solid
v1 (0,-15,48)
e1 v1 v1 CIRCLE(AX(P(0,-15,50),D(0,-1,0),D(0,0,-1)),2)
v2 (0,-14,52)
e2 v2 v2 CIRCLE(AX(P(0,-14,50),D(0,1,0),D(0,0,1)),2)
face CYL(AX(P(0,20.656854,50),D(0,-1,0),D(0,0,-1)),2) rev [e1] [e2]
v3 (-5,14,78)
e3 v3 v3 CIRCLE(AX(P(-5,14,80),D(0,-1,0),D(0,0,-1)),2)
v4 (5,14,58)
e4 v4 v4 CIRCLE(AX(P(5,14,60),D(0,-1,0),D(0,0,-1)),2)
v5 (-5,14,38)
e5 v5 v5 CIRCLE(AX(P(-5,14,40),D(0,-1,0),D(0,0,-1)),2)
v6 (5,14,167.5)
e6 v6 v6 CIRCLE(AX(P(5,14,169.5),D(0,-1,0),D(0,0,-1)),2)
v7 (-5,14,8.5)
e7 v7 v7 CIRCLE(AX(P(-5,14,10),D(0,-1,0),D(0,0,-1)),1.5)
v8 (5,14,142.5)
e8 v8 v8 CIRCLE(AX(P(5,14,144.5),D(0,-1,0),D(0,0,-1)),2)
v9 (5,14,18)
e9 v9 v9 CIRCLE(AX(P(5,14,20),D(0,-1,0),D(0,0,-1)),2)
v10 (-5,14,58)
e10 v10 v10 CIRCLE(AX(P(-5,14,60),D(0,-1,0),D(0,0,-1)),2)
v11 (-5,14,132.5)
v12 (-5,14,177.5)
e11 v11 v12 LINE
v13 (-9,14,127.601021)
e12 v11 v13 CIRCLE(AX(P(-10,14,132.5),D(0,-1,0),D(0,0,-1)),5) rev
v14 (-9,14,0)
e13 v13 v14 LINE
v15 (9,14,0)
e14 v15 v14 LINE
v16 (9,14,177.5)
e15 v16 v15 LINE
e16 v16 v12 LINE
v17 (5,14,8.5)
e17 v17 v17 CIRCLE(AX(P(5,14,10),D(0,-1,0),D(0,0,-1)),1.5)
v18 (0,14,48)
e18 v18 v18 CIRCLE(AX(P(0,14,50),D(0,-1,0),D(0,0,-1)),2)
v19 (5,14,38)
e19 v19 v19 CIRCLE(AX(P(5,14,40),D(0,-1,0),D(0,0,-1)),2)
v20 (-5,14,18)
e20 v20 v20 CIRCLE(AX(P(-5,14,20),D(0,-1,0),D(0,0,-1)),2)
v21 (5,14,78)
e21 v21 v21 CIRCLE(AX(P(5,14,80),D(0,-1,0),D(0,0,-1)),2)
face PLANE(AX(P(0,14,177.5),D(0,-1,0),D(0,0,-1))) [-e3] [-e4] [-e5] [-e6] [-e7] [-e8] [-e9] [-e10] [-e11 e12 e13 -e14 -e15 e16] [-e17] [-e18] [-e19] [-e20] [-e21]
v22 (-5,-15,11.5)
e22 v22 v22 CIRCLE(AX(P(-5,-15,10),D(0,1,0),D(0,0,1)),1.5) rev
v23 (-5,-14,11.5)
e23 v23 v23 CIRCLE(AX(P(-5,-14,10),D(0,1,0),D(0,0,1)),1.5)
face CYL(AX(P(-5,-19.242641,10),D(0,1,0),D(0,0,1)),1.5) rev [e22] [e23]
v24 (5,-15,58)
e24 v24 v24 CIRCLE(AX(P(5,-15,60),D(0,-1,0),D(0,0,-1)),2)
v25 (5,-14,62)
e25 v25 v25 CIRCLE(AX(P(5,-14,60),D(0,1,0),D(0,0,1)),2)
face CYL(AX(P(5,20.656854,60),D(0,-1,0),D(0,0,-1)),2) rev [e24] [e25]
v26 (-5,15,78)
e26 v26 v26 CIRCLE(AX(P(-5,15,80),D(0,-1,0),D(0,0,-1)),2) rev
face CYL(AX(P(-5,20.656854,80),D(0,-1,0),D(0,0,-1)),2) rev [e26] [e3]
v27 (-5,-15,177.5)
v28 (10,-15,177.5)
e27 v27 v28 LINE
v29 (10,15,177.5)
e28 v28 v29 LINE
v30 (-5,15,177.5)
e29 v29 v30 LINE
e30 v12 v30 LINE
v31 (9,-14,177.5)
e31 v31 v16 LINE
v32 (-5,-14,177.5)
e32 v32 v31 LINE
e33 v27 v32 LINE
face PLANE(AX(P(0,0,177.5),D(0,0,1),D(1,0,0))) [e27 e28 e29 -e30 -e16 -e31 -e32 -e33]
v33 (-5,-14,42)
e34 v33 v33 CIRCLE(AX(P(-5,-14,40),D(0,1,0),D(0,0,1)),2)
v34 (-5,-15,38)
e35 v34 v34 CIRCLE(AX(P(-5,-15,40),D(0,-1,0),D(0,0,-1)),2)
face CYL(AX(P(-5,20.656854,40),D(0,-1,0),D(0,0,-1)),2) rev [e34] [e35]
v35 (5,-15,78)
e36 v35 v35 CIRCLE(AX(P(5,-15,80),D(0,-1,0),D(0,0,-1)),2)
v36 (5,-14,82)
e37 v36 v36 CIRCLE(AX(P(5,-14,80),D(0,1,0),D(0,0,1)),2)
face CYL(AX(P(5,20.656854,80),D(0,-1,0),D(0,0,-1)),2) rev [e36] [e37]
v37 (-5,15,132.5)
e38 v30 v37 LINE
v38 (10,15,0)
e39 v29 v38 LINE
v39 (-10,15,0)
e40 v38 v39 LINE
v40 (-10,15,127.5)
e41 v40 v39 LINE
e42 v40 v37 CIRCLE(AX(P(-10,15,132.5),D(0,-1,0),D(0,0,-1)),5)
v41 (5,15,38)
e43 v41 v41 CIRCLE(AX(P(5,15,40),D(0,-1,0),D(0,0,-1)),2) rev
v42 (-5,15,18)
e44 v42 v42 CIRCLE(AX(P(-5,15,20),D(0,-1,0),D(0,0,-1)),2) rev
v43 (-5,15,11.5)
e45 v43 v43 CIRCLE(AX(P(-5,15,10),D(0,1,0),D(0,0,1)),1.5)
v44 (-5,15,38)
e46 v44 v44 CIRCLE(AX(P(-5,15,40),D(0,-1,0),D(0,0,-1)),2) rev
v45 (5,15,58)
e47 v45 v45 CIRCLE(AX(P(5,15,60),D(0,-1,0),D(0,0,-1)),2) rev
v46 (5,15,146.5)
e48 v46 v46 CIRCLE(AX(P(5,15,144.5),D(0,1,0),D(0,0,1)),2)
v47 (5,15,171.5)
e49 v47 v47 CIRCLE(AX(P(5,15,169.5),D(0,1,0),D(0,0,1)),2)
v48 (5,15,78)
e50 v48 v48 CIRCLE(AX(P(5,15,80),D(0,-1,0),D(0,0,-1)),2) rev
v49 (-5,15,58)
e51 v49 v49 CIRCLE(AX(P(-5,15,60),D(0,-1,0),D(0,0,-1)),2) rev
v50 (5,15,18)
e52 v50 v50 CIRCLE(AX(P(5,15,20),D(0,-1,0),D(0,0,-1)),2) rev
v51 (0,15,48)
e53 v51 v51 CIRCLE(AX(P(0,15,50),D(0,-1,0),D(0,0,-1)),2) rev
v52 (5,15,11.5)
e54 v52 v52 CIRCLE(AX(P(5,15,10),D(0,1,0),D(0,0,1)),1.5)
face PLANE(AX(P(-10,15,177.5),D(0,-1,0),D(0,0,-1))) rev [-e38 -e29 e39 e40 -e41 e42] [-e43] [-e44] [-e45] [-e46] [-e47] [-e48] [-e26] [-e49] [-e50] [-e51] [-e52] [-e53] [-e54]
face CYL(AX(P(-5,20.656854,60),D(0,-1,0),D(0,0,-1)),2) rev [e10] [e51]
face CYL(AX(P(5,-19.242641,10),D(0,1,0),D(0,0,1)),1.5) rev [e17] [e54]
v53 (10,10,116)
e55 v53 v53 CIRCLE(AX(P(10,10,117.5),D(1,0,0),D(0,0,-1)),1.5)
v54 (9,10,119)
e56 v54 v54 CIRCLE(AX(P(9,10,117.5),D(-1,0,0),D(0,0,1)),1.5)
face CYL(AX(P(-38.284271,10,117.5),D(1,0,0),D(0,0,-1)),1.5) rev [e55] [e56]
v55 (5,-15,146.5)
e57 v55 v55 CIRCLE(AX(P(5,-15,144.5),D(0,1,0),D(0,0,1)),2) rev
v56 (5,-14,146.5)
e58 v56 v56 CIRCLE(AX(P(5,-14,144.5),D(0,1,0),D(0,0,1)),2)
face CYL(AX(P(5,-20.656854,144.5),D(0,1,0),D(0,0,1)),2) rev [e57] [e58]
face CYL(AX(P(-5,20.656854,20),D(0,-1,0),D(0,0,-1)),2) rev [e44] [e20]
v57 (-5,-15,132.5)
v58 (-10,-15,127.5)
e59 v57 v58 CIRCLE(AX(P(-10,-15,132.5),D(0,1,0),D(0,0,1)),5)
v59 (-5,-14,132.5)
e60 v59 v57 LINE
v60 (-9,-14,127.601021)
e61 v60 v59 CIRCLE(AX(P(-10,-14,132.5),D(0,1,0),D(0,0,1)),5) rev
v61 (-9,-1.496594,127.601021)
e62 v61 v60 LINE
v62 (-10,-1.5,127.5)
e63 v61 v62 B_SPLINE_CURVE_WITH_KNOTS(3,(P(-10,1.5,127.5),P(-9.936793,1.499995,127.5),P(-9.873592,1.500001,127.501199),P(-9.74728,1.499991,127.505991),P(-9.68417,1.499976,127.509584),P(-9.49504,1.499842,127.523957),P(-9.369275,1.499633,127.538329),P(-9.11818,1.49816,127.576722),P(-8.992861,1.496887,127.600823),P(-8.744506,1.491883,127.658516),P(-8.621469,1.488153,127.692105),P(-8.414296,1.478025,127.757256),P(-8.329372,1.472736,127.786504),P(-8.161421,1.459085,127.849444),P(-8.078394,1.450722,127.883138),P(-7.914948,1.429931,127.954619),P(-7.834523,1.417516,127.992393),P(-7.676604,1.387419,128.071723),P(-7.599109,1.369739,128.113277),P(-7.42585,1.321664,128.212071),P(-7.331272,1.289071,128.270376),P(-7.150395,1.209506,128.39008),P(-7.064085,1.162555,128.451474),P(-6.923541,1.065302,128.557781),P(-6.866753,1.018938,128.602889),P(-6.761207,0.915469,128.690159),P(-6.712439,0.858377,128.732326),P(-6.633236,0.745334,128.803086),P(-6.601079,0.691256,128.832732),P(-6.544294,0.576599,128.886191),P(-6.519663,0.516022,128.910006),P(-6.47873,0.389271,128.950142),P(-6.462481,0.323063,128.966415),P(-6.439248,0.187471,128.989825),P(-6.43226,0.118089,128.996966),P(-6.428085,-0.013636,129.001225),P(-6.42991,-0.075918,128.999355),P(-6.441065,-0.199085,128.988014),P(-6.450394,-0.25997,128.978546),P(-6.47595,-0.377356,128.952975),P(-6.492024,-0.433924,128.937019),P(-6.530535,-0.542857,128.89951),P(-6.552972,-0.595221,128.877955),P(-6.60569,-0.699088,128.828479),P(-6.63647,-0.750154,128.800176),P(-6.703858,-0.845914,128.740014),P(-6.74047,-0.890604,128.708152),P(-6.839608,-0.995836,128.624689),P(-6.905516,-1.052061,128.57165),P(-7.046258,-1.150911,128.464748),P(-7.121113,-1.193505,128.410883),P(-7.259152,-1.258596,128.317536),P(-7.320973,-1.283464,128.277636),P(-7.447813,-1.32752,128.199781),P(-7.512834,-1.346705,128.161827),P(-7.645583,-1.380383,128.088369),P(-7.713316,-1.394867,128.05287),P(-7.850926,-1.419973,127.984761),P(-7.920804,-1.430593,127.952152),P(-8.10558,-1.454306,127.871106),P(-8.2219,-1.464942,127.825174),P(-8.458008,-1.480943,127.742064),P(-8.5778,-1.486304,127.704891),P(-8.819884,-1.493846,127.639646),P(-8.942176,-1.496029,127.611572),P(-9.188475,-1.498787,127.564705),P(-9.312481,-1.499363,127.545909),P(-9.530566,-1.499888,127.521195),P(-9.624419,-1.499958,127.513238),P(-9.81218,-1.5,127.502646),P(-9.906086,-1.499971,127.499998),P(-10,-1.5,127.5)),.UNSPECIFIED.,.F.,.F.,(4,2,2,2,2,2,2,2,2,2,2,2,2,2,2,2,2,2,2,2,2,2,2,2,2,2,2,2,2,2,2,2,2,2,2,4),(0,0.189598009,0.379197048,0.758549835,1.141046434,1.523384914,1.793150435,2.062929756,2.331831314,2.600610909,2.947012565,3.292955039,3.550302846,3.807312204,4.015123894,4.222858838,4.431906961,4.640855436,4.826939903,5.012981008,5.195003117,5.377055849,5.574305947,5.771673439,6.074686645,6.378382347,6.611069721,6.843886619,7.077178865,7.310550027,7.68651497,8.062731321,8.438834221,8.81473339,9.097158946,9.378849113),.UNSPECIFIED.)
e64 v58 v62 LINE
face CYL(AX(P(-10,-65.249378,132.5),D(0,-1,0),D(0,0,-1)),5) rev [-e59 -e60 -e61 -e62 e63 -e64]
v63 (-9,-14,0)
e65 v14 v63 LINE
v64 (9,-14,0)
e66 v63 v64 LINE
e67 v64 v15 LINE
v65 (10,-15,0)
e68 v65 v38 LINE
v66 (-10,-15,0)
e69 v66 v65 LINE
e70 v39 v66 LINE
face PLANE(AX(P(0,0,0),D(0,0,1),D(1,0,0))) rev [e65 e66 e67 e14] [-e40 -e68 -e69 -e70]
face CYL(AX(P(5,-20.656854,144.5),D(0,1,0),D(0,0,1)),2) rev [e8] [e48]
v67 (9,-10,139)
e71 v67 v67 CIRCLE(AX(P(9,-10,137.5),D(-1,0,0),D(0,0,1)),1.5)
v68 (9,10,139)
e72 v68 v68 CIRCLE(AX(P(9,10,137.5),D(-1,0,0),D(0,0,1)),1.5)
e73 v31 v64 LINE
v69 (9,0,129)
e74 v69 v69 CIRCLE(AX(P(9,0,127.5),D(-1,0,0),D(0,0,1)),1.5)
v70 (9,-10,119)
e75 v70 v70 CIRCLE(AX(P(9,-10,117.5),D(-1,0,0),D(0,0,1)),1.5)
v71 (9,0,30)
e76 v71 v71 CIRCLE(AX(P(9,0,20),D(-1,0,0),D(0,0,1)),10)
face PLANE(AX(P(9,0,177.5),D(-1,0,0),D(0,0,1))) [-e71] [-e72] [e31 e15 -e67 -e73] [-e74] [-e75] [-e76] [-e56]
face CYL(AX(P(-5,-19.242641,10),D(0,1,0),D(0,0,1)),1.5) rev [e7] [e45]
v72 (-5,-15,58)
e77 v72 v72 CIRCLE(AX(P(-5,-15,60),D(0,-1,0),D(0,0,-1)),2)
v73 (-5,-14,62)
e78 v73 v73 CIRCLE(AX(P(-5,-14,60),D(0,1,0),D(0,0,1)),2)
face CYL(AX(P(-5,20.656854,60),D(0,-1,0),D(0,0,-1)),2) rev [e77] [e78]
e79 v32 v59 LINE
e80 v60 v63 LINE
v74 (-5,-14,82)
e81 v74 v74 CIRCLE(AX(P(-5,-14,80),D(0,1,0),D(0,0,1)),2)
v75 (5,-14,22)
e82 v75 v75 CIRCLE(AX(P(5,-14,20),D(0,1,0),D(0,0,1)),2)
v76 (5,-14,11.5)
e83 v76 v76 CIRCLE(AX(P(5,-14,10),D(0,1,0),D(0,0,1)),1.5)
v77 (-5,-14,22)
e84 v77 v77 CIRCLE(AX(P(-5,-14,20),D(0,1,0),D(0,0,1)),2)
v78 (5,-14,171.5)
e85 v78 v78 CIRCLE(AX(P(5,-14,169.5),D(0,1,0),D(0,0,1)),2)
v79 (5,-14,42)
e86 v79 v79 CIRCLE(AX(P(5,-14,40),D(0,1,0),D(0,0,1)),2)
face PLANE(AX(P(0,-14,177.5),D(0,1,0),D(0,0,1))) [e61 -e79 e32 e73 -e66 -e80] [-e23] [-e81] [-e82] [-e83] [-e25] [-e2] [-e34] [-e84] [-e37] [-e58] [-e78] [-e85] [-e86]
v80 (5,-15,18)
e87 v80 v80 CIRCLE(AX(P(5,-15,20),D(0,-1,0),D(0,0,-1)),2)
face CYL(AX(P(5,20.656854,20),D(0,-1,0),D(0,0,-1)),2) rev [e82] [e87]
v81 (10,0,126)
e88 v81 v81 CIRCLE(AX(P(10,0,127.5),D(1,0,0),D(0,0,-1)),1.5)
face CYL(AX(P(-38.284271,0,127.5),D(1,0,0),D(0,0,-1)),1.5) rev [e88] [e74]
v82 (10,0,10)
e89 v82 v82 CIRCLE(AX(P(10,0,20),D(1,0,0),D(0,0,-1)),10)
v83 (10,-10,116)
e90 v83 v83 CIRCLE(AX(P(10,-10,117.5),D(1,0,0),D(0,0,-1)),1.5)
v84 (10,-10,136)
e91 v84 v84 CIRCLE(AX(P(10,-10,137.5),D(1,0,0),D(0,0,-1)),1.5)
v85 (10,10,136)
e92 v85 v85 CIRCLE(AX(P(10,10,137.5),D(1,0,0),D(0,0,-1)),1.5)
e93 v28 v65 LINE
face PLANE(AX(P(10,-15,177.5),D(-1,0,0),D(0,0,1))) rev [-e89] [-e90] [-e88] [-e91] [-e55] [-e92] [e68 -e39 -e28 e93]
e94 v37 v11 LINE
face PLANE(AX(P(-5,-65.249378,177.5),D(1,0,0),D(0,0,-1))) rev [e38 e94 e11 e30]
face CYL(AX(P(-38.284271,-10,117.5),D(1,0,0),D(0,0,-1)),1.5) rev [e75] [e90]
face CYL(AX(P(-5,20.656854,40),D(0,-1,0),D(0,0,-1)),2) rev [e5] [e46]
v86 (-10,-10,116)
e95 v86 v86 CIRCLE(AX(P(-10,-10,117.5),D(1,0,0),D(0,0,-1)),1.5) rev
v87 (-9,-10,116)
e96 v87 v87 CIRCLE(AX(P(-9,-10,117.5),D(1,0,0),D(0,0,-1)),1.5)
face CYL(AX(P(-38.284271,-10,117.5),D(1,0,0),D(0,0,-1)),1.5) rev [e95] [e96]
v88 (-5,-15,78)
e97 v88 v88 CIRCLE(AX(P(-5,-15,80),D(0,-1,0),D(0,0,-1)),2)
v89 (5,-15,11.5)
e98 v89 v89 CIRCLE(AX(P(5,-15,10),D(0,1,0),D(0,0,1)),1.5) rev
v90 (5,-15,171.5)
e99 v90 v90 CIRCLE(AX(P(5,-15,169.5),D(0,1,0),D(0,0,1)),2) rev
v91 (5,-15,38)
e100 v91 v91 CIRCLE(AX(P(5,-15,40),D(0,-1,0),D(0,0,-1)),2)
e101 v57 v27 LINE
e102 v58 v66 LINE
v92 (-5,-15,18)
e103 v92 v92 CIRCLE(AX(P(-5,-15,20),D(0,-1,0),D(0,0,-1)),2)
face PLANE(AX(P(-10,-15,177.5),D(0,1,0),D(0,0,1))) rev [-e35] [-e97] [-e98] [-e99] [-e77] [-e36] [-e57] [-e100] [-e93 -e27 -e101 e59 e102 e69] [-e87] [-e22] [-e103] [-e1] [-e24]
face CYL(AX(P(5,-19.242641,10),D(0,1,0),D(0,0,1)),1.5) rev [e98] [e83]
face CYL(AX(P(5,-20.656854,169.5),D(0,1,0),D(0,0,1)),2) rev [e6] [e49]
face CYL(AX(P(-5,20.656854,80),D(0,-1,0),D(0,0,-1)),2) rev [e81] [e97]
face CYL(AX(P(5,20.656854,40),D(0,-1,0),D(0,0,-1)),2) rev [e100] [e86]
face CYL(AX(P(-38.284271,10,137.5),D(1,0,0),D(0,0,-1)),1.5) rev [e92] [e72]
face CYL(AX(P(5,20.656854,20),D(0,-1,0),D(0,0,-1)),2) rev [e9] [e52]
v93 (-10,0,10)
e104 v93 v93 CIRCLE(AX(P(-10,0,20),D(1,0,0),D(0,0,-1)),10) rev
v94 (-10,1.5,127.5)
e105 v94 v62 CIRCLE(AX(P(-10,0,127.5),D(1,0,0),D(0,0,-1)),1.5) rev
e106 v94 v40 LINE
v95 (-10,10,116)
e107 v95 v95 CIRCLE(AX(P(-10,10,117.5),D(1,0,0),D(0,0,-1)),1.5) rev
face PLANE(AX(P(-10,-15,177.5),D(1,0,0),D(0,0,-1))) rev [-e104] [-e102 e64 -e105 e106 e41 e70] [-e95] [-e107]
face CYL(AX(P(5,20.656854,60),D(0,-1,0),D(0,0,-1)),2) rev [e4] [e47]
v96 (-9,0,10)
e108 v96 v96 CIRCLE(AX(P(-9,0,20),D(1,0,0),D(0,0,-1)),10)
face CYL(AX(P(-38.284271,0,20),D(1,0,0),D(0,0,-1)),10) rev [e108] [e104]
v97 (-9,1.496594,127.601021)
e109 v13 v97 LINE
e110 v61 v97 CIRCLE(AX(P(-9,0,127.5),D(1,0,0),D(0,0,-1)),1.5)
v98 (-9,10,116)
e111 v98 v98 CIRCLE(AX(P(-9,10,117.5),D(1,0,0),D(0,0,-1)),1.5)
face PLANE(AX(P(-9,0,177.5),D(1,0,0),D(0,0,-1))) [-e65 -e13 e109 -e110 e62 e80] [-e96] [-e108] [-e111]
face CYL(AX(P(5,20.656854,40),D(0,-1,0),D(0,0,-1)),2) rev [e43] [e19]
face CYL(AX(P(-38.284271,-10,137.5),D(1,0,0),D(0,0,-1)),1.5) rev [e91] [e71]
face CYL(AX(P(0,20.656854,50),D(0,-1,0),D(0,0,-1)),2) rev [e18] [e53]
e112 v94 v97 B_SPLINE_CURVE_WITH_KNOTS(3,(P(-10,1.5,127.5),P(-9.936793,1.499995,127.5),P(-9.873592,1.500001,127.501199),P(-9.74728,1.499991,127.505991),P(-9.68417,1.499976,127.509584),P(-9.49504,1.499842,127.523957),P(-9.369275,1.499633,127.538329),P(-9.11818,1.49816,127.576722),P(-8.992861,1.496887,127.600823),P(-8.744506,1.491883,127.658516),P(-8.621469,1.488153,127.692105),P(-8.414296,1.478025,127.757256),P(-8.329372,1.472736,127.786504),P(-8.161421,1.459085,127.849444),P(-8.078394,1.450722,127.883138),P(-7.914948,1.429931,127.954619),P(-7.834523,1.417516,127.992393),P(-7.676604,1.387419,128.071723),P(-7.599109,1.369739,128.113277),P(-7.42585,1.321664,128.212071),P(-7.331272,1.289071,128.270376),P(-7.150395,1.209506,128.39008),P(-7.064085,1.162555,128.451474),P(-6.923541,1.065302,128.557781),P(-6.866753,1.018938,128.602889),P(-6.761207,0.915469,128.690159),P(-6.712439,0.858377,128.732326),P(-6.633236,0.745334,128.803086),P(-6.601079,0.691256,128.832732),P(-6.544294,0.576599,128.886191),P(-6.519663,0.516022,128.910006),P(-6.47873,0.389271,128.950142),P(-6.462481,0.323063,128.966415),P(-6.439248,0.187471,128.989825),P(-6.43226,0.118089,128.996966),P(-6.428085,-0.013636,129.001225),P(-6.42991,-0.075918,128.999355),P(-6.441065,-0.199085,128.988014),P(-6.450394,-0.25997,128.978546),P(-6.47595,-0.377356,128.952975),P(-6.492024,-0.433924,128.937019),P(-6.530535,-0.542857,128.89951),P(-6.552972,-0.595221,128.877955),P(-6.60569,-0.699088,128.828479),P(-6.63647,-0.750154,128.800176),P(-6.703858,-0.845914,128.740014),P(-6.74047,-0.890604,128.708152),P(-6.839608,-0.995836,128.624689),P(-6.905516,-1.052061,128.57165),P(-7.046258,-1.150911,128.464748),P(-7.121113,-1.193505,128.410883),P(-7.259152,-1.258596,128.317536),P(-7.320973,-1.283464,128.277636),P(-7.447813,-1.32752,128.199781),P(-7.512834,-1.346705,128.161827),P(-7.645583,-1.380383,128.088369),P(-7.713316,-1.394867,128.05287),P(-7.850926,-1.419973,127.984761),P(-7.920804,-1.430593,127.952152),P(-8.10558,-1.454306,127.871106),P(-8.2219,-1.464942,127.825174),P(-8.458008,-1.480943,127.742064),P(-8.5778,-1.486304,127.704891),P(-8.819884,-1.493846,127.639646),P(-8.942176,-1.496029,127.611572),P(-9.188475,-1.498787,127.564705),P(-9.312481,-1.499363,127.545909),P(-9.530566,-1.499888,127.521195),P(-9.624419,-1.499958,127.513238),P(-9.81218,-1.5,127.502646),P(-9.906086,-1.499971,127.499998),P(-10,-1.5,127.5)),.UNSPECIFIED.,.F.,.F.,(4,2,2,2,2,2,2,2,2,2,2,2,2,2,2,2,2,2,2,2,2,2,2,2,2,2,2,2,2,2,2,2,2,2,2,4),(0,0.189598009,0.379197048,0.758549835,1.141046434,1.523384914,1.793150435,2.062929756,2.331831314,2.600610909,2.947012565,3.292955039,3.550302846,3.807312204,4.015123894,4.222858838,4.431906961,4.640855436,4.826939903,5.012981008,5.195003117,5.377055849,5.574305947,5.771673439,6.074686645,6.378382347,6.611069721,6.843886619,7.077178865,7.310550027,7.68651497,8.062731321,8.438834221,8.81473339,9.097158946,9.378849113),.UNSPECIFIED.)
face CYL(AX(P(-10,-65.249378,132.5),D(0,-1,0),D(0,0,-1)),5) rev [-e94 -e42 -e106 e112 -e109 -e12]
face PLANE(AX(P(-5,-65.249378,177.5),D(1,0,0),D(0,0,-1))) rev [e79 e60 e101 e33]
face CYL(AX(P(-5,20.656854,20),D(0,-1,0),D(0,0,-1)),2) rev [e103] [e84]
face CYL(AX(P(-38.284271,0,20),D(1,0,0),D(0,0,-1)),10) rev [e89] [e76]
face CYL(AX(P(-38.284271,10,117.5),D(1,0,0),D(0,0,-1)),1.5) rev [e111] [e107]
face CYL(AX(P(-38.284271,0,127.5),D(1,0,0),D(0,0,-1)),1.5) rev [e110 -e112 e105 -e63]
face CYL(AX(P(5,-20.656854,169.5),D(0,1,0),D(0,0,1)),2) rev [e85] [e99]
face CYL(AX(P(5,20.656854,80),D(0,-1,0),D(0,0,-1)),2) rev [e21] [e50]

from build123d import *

# Parameters (mm, degrees)
SKETCH_1_W          = 20
SKETCH_1_H          = 30
SKETCH_1_W_2        = 18
SKETCH_1_H_2        = 28
EXTRUDE_1_DEPTH     = 177.5
CUT_EXTRUDE_1_REACH = 182.295
SKETCH_2_R          = 1.5
CUT_EXTRUDE_2_REACH = 182.295
SKETCH_3_W          = 5
SKETCH_3_H          = 50
FILLET_1_R          = 5
CUT_EXTRUDE_3_REACH = 182.295
SKETCH_4_R          = 2
CUT_EXTRUDE_4_REACH = 182.295
SKETCH_5_R          = 2
CUT_EXTRUDE_5_REACH = 181.252
SKETCH_6_R          = 1.5
SKETCH_6_R_2        = 10


with BuildPart() as part:
    # 草图1 → 拉伸-薄壁1 (new body)
    with BuildSketch(Plane.XY):
        Rectangle(SKETCH_1_W, SKETCH_1_H)
        Rectangle(SKETCH_1_W_2, SKETCH_1_H_2, mode=Mode.SUBTRACT)
    extrude(amount=EXTRUDE_1_DEPTH)

    # 切除-拉伸1: up to this face of the body (flat: up to its plane)
    cut_extrude_1_end = Plane(part.part.faces().sort_by_distance((0, -15, 88.75))[0])
    # 草图2 → 切除-拉伸1 (cut, up to the picked face)
    with BuildSketch(Plane(origin=(0, 15, 0), x_dir=(1, 0, 0), z_dir=(0, 1, 0)), mode=Mode.PRIVATE) as cut_extrude_1_sk1:
        with Locations(Location((5, -10, 0), (0, 0, 270))):
            Circle(SKETCH_2_R)
    cut_extrude_1_tool1 = split(extrude(cut_extrude_1_sk1.sketch, amount=-CUT_EXTRUDE_1_REACH, mode=Mode.PRIVATE), bisect_by=cut_extrude_1_end, keep=Keep.BOTH, mode=Mode.PRIVATE)
    # 草图2 → 切除-拉伸1 (cut, up to the picked face)
    with BuildSketch(Plane(origin=(0, 15, 0), x_dir=(1, 0, 0), z_dir=(0, 1, 0)), mode=Mode.PRIVATE) as cut_extrude_1_sk2:
        with Locations(Location((-5, -10, 0), (0, 0, 270))):
            Circle(SKETCH_2_R)
    cut_extrude_1_tool2 = split(extrude(cut_extrude_1_sk2.sketch, amount=-CUT_EXTRUDE_1_REACH, mode=Mode.PRIVATE), bisect_by=cut_extrude_1_end, keep=Keep.BOTH, mode=Mode.PRIVATE)
    add(cut_extrude_1_tool1.solids().sort_by(Axis((5, 15, 10), (0, -1, 0)))[0], mode=Mode.SUBTRACT)
    add(cut_extrude_1_tool2.solids().sort_by(Axis((-5, 15, 10), (0, -1, 0)))[0], mode=Mode.SUBTRACT)

    # 切除-拉伸2: up to this face of the body (flat: up to its plane)
    cut_extrude_2_end = Plane(part.part.faces().sort_by_distance((0, -15, 89.064860035))[0])
    # 草图3 → 切除-拉伸2 (cut, up to the picked face)
    with BuildSketch(Plane(origin=(0, 15, 0), x_dir=(1, 0, 0), z_dir=(0, 1, 0)), mode=Mode.PRIVATE) as cut_extrude_2_sk1:
        with Locations((-7.5, -152.5)):
            Rectangle(SKETCH_3_W, SKETCH_3_H)
    cut_extrude_2_tool1 = split(extrude(cut_extrude_2_sk1.sketch, amount=-CUT_EXTRUDE_2_REACH, mode=Mode.PRIVATE), bisect_by=cut_extrude_2_end, keep=Keep.BOTH, mode=Mode.PRIVATE)
    add(cut_extrude_2_tool1.solids().sort_by(Axis((-7.5, 15, 152.5), (0, -1, 0)))[0], mode=Mode.SUBTRACT)

    # 圆角1
    fillet_1_edges = [part.edges().sort_by_distance(p)[0] for p in [
        (-5, 14.5, 127.5),
    ]]
    fillet(fillet_1_edges, radius=FILLET_1_R - 0.0001)  # a hair under: the kernel refuses the full size

    # 切除-拉伸3: up to this face of the body (flat: up to its plane)
    cut_extrude_3_end = Plane(part.part.faces().sort_by_distance((0.559725578, -15, 84.310829926))[0])
    # 草图4 → 切除-拉伸3 (cut, up to the picked face)
    with BuildSketch(Plane(origin=(0, 15, 0), x_dir=(1, 0, 0), z_dir=(0, 1, 0)), mode=Mode.PRIVATE) as cut_extrude_3_sk1:
        with Locations(Location((5, -144.5, 0), (0, 0, 270))):
            Circle(SKETCH_4_R)
    cut_extrude_3_tool1 = split(extrude(cut_extrude_3_sk1.sketch, amount=-CUT_EXTRUDE_3_REACH, mode=Mode.PRIVATE), bisect_by=cut_extrude_3_end, keep=Keep.BOTH, mode=Mode.PRIVATE)
    # 草图4 → 切除-拉伸3 (cut, up to the picked face)
    with BuildSketch(Plane(origin=(0, 15, 0), x_dir=(1, 0, 0), z_dir=(0, 1, 0)), mode=Mode.PRIVATE) as cut_extrude_3_sk2:
        with Locations(Location((5, -169.5, 0), (0, 0, 270))):
            Circle(SKETCH_4_R)
    cut_extrude_3_tool2 = split(extrude(cut_extrude_3_sk2.sketch, amount=-CUT_EXTRUDE_3_REACH, mode=Mode.PRIVATE), bisect_by=cut_extrude_3_end, keep=Keep.BOTH, mode=Mode.PRIVATE)
    add(cut_extrude_3_tool1.solids().sort_by(Axis((5, 15, 144.5), (0, -1, 0)))[0], mode=Mode.SUBTRACT)
    add(cut_extrude_3_tool2.solids().sort_by(Axis((5, 15, 169.5), (0, -1, 0)))[0], mode=Mode.SUBTRACT)

    # 切除-拉伸4: up to this face of the body (flat: up to its plane)
    cut_extrude_4_end = Plane(part.part.faces().sort_by_distance((0.525557475, 15, 83.751483629))[0])
    # 草图5 → 切除-拉伸4 (cut, up to the picked face)
    with BuildSketch(Plane.XZ.offset(15), mode=Mode.PRIVATE) as cut_extrude_4_sk1:
        with Locations(Location((5, 20, 0), (0, 0, 270))):
            Circle(SKETCH_5_R)
    cut_extrude_4_tool1 = split(extrude(cut_extrude_4_sk1.sketch, amount=-CUT_EXTRUDE_4_REACH, mode=Mode.PRIVATE), bisect_by=cut_extrude_4_end, keep=Keep.BOTH, mode=Mode.PRIVATE)
    # 草图5 → 切除-拉伸4 (cut, up to the picked face)
    with BuildSketch(Plane.XZ.offset(15), mode=Mode.PRIVATE) as cut_extrude_4_sk2:
        with Locations(Location((5, 40, 0), (0, 0, 270))):
            Circle(SKETCH_5_R)
    cut_extrude_4_tool2 = split(extrude(cut_extrude_4_sk2.sketch, amount=-CUT_EXTRUDE_4_REACH, mode=Mode.PRIVATE), bisect_by=cut_extrude_4_end, keep=Keep.BOTH, mode=Mode.PRIVATE)
    # 草图5 → 切除-拉伸4 (cut, up to the picked face)
    with BuildSketch(Plane.XZ.offset(15), mode=Mode.PRIVATE) as cut_extrude_4_sk3:
        with Locations(Location((5, 60, 0), (0, 0, 270))):
            Circle(SKETCH_5_R)
    cut_extrude_4_tool3 = split(extrude(cut_extrude_4_sk3.sketch, amount=-CUT_EXTRUDE_4_REACH, mode=Mode.PRIVATE), bisect_by=cut_extrude_4_end, keep=Keep.BOTH, mode=Mode.PRIVATE)
    # 草图5 → 切除-拉伸4 (cut, up to the picked face)
    with BuildSketch(Plane.XZ.offset(15), mode=Mode.PRIVATE) as cut_extrude_4_sk4:
        with Locations(Location((5, 80, 0), (0, 0, 270))):
            Circle(SKETCH_5_R)
    cut_extrude_4_tool4 = split(extrude(cut_extrude_4_sk4.sketch, amount=-CUT_EXTRUDE_4_REACH, mode=Mode.PRIVATE), bisect_by=cut_extrude_4_end, keep=Keep.BOTH, mode=Mode.PRIVATE)
    # 草图5 → 切除-拉伸4 (cut, up to the picked face)
    with BuildSketch(Plane.XZ.offset(15), mode=Mode.PRIVATE) as cut_extrude_4_sk5:
        with Locations(Location((-5, 80, 0), (0, 0, 270))):
            Circle(SKETCH_5_R)
    cut_extrude_4_tool5 = split(extrude(cut_extrude_4_sk5.sketch, amount=-CUT_EXTRUDE_4_REACH, mode=Mode.PRIVATE), bisect_by=cut_extrude_4_end, keep=Keep.BOTH, mode=Mode.PRIVATE)
    # 草图5 → 切除-拉伸4 (cut, up to the picked face)
    with BuildSketch(Plane.XZ.offset(15), mode=Mode.PRIVATE) as cut_extrude_4_sk6:
        with Locations(Location((-5, 60, 0), (0, 0, 270))):
            Circle(SKETCH_5_R)
    cut_extrude_4_tool6 = split(extrude(cut_extrude_4_sk6.sketch, amount=-CUT_EXTRUDE_4_REACH, mode=Mode.PRIVATE), bisect_by=cut_extrude_4_end, keep=Keep.BOTH, mode=Mode.PRIVATE)
    # 草图5 → 切除-拉伸4 (cut, up to the picked face)
    with BuildSketch(Plane.XZ.offset(15), mode=Mode.PRIVATE) as cut_extrude_4_sk7:
        with Locations(Location((-5, 40, 0), (0, 0, 270))):
            Circle(SKETCH_5_R)
    cut_extrude_4_tool7 = split(extrude(cut_extrude_4_sk7.sketch, amount=-CUT_EXTRUDE_4_REACH, mode=Mode.PRIVATE), bisect_by=cut_extrude_4_end, keep=Keep.BOTH, mode=Mode.PRIVATE)
    # 草图5 → 切除-拉伸4 (cut, up to the picked face)
    with BuildSketch(Plane.XZ.offset(15), mode=Mode.PRIVATE) as cut_extrude_4_sk8:
        with Locations(Location((-5, 20, 0), (0, 0, 270))):
            Circle(SKETCH_5_R)
    cut_extrude_4_tool8 = split(extrude(cut_extrude_4_sk8.sketch, amount=-CUT_EXTRUDE_4_REACH, mode=Mode.PRIVATE), bisect_by=cut_extrude_4_end, keep=Keep.BOTH, mode=Mode.PRIVATE)
    # 草图5 → 切除-拉伸4 (cut, up to the picked face)
    with BuildSketch(Plane.XZ.offset(15), mode=Mode.PRIVATE) as cut_extrude_4_sk9:
        with Locations(Location((0, 50, 0), (0, 0, 270))):
            Circle(SKETCH_5_R)
    cut_extrude_4_tool9 = split(extrude(cut_extrude_4_sk9.sketch, amount=-CUT_EXTRUDE_4_REACH, mode=Mode.PRIVATE), bisect_by=cut_extrude_4_end, keep=Keep.BOTH, mode=Mode.PRIVATE)
    add(cut_extrude_4_tool1.solids().sort_by(Axis((5, -15, 20), (0, 1, 0)))[0], mode=Mode.SUBTRACT)
    add(cut_extrude_4_tool2.solids().sort_by(Axis((5, -15, 40), (0, 1, 0)))[0], mode=Mode.SUBTRACT)
    add(cut_extrude_4_tool3.solids().sort_by(Axis((5, -15, 60), (0, 1, 0)))[0], mode=Mode.SUBTRACT)
    add(cut_extrude_4_tool4.solids().sort_by(Axis((5, -15, 80), (0, 1, 0)))[0], mode=Mode.SUBTRACT)
    add(cut_extrude_4_tool5.solids().sort_by(Axis((-5, -15, 80), (0, 1, 0)))[0], mode=Mode.SUBTRACT)
    add(cut_extrude_4_tool6.solids().sort_by(Axis((-5, -15, 60), (0, 1, 0)))[0], mode=Mode.SUBTRACT)
    add(cut_extrude_4_tool7.solids().sort_by(Axis((-5, -15, 40), (0, 1, 0)))[0], mode=Mode.SUBTRACT)
    add(cut_extrude_4_tool8.solids().sort_by(Axis((-5, -15, 20), (0, 1, 0)))[0], mode=Mode.SUBTRACT)
    add(cut_extrude_4_tool9.solids().sort_by(Axis((0, -15, 50), (0, 1, 0)))[0], mode=Mode.SUBTRACT)

    # 切除-拉伸5: up to this face of the body (flat: up to its plane)
    cut_extrude_5_end = Plane(part.part.faces().sort_by_distance((-10, 0, 63.75))[0])
    # 草图6 → 切除-拉伸5 (cut, up to the picked face)
    with BuildSketch(Plane(origin=(10, 0, 0), x_dir=(0, 0, -1), z_dir=(1, 0, 0)), mode=Mode.PRIVATE) as cut_extrude_5_sk1:
        with Locations((-127.5, 0)):
            Circle(SKETCH_6_R)
    cut_extrude_5_tool1 = split(extrude(cut_extrude_5_sk1.sketch, amount=-CUT_EXTRUDE_5_REACH, mode=Mode.PRIVATE), bisect_by=cut_extrude_5_end, keep=Keep.BOTH, mode=Mode.PRIVATE)
    # 草图6 → 切除-拉伸5 (cut, up to the picked face)
    with BuildSketch(Plane(origin=(10, 0, 0), x_dir=(0, 0, -1), z_dir=(1, 0, 0)), mode=Mode.PRIVATE) as cut_extrude_5_sk2:
        with Locations((-117.5, 10)):
            Circle(SKETCH_6_R)
    cut_extrude_5_tool2 = split(extrude(cut_extrude_5_sk2.sketch, amount=-CUT_EXTRUDE_5_REACH, mode=Mode.PRIVATE), bisect_by=cut_extrude_5_end, keep=Keep.BOTH, mode=Mode.PRIVATE)
    # 草图6 → 切除-拉伸5 (cut, up to the picked face)
    with BuildSketch(Plane(origin=(10, 0, 0), x_dir=(0, 0, -1), z_dir=(1, 0, 0)), mode=Mode.PRIVATE) as cut_extrude_5_sk3:
        with Locations((-117.5, -10)):
            Circle(SKETCH_6_R)
    cut_extrude_5_tool3 = split(extrude(cut_extrude_5_sk3.sketch, amount=-CUT_EXTRUDE_5_REACH, mode=Mode.PRIVATE), bisect_by=cut_extrude_5_end, keep=Keep.BOTH, mode=Mode.PRIVATE)
    # 草图6 → 切除-拉伸5 (cut, up to the picked face)
    with BuildSketch(Plane(origin=(10, 0, 0), x_dir=(0, 0, -1), z_dir=(1, 0, 0)), mode=Mode.PRIVATE) as cut_extrude_5_sk4:
        with Locations((-137.5, -10)):
            Circle(SKETCH_6_R)
    cut_extrude_5_tool4 = split(extrude(cut_extrude_5_sk4.sketch, amount=-CUT_EXTRUDE_5_REACH, mode=Mode.PRIVATE), bisect_by=cut_extrude_5_end, keep=Keep.BOTH, mode=Mode.PRIVATE)
    # 草图6 → 切除-拉伸5 (cut, up to the picked face)
    with BuildSketch(Plane(origin=(10, 0, 0), x_dir=(0, 0, -1), z_dir=(1, 0, 0)), mode=Mode.PRIVATE) as cut_extrude_5_sk5:
        with Locations((-137.5, 10)):
            Circle(SKETCH_6_R)
    cut_extrude_5_tool5 = split(extrude(cut_extrude_5_sk5.sketch, amount=-CUT_EXTRUDE_5_REACH, mode=Mode.PRIVATE), bisect_by=cut_extrude_5_end, keep=Keep.BOTH, mode=Mode.PRIVATE)
    # 草图6 → 切除-拉伸5 (cut, up to the picked face)
    with BuildSketch(Plane(origin=(10, 0, 0), x_dir=(0, 0, -1), z_dir=(1, 0, 0)), mode=Mode.PRIVATE) as cut_extrude_5_sk6:
        with Locations((-20, 0)):
            Circle(SKETCH_6_R_2)
    cut_extrude_5_tool6 = split(extrude(cut_extrude_5_sk6.sketch, amount=-CUT_EXTRUDE_5_REACH, mode=Mode.PRIVATE), bisect_by=cut_extrude_5_end, keep=Keep.BOTH, mode=Mode.PRIVATE)
    add(cut_extrude_5_tool1.solids().sort_by(Axis((10, 0, 127.5), (-1, 0, 0)))[0], mode=Mode.SUBTRACT)
    add(cut_extrude_5_tool2.solids().sort_by(Axis((10, 10, 117.5), (-1, 0, 0)))[0], mode=Mode.SUBTRACT)
    add(cut_extrude_5_tool3.solids().sort_by(Axis((10, -10, 117.5), (-1, 0, 0)))[0], mode=Mode.SUBTRACT)
    add(cut_extrude_5_tool4.solids().sort_by(Axis((10, -10, 137.5), (-1, 0, 0)))[0], mode=Mode.SUBTRACT)
    add(cut_extrude_5_tool5.solids().sort_by(Axis((10, 10, 137.5), (-1, 0, 0)))[0], mode=Mode.SUBTRACT)
    add(cut_extrude_5_tool6.solids().sort_by(Axis((10, 0, 20), (-1, 0, 0)))[0], mode=Mode.SUBTRACT)


solid = part.part
